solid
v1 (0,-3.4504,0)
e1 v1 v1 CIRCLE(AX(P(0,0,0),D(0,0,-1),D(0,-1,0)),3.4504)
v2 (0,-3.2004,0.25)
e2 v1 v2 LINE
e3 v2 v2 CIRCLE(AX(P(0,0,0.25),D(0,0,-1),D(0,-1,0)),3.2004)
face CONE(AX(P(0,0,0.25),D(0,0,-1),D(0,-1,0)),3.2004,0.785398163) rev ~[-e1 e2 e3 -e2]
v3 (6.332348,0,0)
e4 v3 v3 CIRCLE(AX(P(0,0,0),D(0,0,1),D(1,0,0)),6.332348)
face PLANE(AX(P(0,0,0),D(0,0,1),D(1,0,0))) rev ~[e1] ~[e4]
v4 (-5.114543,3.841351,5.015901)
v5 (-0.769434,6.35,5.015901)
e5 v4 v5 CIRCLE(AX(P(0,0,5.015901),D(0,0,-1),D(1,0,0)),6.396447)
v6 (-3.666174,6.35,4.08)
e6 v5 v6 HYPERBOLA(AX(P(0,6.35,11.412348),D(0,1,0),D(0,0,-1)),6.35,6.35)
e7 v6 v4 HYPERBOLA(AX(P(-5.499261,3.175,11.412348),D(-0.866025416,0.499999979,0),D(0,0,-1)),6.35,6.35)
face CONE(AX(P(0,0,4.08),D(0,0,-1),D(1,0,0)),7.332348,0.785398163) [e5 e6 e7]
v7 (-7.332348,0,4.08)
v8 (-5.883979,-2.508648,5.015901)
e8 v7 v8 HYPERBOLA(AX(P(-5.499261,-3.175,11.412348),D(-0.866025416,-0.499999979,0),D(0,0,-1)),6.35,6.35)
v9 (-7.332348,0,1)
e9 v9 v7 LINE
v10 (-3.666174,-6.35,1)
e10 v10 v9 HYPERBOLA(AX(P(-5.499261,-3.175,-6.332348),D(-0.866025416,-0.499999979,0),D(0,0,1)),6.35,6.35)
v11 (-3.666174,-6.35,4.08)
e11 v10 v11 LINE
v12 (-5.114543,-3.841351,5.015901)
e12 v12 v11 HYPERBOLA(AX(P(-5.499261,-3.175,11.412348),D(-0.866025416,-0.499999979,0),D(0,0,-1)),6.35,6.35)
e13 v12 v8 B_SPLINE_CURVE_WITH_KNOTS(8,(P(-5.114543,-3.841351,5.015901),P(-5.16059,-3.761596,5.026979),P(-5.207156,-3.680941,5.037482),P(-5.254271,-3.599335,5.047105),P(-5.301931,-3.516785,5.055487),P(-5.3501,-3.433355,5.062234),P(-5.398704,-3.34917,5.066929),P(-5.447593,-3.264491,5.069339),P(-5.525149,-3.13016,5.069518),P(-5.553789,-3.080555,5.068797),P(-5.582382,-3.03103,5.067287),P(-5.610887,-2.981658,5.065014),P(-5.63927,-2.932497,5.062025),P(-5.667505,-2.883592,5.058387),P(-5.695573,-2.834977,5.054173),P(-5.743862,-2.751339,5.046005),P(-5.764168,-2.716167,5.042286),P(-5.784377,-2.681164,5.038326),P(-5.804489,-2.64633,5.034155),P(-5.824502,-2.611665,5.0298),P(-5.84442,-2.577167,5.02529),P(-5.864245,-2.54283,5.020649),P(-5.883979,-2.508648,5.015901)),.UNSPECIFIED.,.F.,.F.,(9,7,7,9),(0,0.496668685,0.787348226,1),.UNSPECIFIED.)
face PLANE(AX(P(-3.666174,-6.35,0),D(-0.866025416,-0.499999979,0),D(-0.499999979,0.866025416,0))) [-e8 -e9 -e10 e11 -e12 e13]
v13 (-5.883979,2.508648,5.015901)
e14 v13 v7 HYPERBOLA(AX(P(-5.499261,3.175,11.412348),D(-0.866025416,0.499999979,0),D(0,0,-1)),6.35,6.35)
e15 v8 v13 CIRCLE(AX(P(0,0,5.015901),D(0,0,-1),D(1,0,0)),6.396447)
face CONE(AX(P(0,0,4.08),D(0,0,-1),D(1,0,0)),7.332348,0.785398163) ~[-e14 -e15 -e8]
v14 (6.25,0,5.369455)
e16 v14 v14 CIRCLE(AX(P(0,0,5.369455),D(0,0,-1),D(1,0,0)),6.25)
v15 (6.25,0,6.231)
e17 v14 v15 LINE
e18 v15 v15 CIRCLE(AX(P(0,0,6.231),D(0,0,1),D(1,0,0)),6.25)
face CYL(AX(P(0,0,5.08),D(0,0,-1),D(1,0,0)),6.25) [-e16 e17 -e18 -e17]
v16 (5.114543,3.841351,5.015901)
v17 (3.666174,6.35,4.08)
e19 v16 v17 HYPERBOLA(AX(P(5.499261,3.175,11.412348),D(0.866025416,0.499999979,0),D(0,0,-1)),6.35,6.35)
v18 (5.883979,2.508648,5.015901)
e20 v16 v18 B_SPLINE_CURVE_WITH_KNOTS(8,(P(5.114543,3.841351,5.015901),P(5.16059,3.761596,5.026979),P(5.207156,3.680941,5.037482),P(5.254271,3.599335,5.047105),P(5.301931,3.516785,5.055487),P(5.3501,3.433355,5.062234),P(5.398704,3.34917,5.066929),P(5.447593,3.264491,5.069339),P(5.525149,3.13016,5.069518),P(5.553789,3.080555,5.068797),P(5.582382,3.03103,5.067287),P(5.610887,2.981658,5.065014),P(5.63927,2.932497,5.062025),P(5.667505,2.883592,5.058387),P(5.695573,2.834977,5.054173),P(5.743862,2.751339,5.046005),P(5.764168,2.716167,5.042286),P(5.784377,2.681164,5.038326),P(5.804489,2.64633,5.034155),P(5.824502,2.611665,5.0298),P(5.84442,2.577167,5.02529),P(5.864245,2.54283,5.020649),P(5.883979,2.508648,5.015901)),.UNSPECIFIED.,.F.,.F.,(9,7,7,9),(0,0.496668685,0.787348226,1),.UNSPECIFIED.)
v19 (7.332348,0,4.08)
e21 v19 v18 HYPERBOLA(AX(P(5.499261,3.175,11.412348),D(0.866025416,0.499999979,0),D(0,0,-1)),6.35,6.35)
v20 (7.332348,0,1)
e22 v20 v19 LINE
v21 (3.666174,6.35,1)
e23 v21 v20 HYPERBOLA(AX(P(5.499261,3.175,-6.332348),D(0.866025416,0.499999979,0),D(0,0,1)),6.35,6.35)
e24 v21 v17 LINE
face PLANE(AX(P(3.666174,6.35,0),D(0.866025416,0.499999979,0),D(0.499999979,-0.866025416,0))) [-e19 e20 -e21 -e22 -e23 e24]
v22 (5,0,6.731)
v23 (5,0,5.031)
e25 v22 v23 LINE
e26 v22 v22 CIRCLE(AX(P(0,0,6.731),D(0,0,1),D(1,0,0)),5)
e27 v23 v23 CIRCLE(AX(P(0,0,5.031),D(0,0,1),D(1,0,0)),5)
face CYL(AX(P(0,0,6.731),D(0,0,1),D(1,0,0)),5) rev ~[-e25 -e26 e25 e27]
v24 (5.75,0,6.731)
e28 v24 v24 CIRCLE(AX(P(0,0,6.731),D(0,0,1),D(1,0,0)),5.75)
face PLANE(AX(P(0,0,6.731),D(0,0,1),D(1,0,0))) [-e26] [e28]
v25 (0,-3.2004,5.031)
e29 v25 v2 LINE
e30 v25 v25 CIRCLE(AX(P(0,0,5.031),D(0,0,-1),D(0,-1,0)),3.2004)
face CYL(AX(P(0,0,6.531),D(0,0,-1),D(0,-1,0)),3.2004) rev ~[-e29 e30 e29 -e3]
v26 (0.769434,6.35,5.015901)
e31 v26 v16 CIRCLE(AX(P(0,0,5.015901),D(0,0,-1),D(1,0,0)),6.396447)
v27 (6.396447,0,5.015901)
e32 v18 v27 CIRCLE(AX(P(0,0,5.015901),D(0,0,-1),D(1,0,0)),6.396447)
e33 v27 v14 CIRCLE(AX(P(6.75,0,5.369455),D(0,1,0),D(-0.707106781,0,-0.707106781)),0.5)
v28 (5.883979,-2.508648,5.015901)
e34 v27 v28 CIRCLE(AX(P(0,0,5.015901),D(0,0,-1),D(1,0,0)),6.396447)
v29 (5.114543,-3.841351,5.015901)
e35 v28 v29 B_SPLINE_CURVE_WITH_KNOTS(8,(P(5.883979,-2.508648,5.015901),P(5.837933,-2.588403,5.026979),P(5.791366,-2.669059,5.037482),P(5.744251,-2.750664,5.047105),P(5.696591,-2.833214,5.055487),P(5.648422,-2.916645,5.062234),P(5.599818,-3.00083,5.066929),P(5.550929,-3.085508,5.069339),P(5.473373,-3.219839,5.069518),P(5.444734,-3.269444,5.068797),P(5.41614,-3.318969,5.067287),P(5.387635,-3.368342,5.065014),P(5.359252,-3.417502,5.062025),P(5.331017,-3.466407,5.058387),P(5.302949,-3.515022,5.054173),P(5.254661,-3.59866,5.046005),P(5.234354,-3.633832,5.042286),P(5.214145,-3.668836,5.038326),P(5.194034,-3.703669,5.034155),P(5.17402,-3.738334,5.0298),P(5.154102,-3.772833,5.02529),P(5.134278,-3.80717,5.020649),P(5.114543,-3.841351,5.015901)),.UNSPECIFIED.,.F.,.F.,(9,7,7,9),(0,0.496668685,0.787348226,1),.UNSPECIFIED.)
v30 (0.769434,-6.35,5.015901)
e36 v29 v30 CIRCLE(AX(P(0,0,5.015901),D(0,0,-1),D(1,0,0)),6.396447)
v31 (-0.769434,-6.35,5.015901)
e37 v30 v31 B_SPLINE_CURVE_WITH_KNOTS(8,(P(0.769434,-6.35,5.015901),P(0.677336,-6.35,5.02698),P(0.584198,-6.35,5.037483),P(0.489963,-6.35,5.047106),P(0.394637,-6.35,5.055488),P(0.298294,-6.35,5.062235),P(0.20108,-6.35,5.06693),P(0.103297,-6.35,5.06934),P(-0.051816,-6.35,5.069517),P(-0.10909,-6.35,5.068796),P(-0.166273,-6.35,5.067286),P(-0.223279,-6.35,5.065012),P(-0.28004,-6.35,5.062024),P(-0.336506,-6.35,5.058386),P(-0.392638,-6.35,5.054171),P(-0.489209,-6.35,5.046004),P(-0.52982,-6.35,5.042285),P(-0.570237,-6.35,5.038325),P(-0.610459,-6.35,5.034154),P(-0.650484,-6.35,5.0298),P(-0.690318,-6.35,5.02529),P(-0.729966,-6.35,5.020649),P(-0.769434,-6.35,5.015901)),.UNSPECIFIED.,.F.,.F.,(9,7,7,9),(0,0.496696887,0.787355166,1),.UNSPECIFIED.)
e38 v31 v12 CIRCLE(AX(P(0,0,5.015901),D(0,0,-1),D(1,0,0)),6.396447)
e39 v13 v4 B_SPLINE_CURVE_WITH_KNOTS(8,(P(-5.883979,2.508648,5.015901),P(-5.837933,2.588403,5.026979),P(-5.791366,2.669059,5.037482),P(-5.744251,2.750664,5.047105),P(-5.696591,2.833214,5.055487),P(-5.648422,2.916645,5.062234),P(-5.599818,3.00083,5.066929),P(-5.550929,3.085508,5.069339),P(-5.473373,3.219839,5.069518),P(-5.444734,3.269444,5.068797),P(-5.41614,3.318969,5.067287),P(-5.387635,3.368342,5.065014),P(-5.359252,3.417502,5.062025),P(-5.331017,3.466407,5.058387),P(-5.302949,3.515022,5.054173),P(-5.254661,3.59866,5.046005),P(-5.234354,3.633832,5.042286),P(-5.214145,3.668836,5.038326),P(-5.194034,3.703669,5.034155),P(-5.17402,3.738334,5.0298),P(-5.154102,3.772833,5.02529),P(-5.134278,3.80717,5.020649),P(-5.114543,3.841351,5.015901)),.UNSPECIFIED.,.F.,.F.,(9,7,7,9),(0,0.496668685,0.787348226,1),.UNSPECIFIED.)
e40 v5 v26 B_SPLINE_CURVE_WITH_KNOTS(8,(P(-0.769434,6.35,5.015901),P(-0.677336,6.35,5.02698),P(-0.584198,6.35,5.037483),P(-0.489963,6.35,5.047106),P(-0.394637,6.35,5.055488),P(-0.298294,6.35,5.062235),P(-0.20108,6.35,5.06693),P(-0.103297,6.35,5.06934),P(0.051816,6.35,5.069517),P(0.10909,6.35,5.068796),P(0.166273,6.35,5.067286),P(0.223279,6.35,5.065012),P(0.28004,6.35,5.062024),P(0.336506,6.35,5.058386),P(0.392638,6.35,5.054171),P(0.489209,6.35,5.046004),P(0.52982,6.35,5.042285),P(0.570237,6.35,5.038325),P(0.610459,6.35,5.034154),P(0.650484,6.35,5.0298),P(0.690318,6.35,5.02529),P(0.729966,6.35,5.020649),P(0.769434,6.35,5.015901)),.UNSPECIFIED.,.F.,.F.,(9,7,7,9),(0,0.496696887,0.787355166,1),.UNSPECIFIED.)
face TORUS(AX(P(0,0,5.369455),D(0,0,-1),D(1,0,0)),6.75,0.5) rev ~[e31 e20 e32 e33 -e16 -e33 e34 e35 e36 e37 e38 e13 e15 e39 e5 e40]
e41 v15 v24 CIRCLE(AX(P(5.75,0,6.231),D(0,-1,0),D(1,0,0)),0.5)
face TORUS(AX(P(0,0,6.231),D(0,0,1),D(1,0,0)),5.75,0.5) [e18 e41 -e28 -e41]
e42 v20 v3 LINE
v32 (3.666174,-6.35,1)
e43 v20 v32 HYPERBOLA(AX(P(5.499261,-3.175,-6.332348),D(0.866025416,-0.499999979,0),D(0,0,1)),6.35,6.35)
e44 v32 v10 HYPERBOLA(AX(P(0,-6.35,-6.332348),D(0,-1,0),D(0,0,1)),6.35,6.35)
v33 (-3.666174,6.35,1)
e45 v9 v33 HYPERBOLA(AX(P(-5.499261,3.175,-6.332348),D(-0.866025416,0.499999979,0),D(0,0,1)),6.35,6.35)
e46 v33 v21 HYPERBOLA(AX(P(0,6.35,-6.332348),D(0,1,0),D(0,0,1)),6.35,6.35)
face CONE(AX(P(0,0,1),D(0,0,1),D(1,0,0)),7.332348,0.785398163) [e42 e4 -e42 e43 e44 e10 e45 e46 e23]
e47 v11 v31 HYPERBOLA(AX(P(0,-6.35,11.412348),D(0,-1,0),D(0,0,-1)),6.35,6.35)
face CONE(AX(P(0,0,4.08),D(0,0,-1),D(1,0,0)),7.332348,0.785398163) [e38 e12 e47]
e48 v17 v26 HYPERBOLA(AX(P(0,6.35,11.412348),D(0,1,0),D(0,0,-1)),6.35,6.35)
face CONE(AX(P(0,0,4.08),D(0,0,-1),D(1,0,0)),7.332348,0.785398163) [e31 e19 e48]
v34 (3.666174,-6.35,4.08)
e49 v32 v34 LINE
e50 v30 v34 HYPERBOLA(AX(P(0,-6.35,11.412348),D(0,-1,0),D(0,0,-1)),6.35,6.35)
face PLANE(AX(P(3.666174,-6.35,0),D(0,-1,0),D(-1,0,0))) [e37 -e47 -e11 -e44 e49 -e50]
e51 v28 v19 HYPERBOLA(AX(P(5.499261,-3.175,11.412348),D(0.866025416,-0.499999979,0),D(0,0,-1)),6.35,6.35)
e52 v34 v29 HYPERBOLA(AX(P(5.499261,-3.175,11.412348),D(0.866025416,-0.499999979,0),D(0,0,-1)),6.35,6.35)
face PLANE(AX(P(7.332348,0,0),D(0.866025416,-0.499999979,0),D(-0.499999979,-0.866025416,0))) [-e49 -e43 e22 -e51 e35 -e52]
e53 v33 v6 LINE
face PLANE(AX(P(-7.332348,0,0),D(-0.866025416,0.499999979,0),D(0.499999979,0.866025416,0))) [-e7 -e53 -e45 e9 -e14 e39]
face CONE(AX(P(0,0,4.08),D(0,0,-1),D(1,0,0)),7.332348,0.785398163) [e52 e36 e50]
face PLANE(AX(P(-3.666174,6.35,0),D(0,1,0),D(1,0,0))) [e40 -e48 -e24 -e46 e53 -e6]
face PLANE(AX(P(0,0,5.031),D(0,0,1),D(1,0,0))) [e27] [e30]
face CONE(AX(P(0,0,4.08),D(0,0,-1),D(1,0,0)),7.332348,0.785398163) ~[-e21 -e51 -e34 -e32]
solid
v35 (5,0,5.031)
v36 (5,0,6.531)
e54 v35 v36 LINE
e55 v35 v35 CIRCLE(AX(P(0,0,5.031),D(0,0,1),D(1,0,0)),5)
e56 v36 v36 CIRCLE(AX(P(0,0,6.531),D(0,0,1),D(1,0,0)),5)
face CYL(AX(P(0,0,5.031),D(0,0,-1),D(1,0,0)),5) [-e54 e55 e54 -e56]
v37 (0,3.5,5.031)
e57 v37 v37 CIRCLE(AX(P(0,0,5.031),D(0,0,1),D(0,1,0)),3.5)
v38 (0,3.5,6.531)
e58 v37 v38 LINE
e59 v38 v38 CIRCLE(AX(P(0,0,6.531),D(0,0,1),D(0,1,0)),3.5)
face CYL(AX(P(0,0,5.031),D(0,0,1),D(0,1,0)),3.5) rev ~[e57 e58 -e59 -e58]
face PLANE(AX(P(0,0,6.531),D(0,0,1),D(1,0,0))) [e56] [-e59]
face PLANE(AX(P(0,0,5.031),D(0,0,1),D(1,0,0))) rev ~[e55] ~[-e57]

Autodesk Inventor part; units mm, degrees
ref_plane "YZ Plane" through (0, 0, 0) normal (1, 0, 0) x (0, 1, 0)
ref_plane "XZ Plane" through (0, 0, 0) normal (0, 1, 0) x (-1, 0, 0)
ref_plane "XY Plane" through (0, 0, 0) normal (0, 0, 1) x (1, 0, 0)
sketch "Sketch1" plane through (0, 0, 0) normal (0, 0, 1) x (1, 0, 0)
  circle A0 centre (0, 0) radius 7.332348
  line L0 (-3.666174, 6.35) -> (3.666174, 6.35)
  line L1 (3.666174, 6.35) -> (7.332348, 0)
  line L2 (7.332348, 0) -> (3.666174, -6.35)
  line L3 (3.666174, -6.35) -> (-3.666174, -6.35)
  line L4 (-3.666174, -6.35) -> (-7.332348, 0)
  line L5 (-7.332348, 0) -> (-3.666174, 6.35)
  point P0 (-7.332348, 0)
  point P1 (-7.332348, 0)
  point P2 (-3.666174, 6.35)
  point P3 (-3.666174, 6.35)
  point P4 (-3.666174, -6.35)
  point P5 (-3.666174, -6.35)
  point P6 (3.666174, -6.35)
  point P7 (3.666174, -6.35)
  point P8 (7.332348, 0)
  point P9 (7.332348, 0)
  dimension "d0" = 12.7
extrude "Extrusion1" add sketch "Sketch1" along normal blind 5.08
chamfer "Chamfer1" distance 1 angle 45 2 edges at (-7.3323, 0, 0) (-7.3323, 0, 5.08)
extrude "Extrusion2" cut sketch "Sketch1" along normal through all contours L1 A0 | A0 L2 | L0 A0 | A0 L3 | L5 A0 | A0 L4
sketch "Sketch2" plane through (0, 0, 5.08) normal (0, 0, 1) x (1, 0, 0)
  circle A0 centre (0, 0) radius 6.332348
  circle A1 centre (0, 0) radius 6.25
  point P0 (2.236519, -6.35)
  point P1 (6.617521, 1.238118)
  dimension "d9" = 12.5
extrude "Extrusion3" add sketch "Sketch2" along normal blind 1.651 contours A1
fillet "Fillet1" radius 0.5 3 edges at (-6.25, 0, 5.08) (-6.3323, 0, 5.08) (-6.25, 0, 6.731)
sketch "Sketch3" plane through (0, 0, 6.731) normal (0, 0, 1) x (1, 0, 0)
  circle A0 centre (0, 0) radius 5
  dimension "d13" = 10
extrude "Extrusion4" cut sketch "Sketch3" against normal blind 1.7
sketch "Sketch4" plane through (0, 0, 5.031) normal (0, 0, 1) x (1, 0, 0)
  circle A0 centre (0, 0) radius 5 projected
extrude "Extrusion5" add sketch "Sketch4" along normal blind 1.5 separate body
sketch "Sketch5" plane through (0, 0, 6.531) normal (0, 0, 1) x (1, 0, 0)
  circle A0 centre (0, 0) radius 5 projected
hole "Hole1" at (0, 0, 6.531) direction (0, 0, -1) diameter 6.4008 end through all bodies 1 thread size "5/16-18 UNC" class "2B" standard "ANSI Unified Screw Threads"
sketch "Sketch6" plane through (0, 0, 5.031) normal (0, 0, -1) x (-1, 0, 0)
  circle A0 centre (0, 0) radius 3.2004 projected
hole "Hole2" at (0, 0, 5.031) direction (0, 0, 1) diameter 7 end through all bodies 2
chamfer "Chamfer2" distance 0.25 angle 45 1 edges at (0, 3.2004, 0)
properties part number "Gas Strut Locknut" material "Stainless Steel"
